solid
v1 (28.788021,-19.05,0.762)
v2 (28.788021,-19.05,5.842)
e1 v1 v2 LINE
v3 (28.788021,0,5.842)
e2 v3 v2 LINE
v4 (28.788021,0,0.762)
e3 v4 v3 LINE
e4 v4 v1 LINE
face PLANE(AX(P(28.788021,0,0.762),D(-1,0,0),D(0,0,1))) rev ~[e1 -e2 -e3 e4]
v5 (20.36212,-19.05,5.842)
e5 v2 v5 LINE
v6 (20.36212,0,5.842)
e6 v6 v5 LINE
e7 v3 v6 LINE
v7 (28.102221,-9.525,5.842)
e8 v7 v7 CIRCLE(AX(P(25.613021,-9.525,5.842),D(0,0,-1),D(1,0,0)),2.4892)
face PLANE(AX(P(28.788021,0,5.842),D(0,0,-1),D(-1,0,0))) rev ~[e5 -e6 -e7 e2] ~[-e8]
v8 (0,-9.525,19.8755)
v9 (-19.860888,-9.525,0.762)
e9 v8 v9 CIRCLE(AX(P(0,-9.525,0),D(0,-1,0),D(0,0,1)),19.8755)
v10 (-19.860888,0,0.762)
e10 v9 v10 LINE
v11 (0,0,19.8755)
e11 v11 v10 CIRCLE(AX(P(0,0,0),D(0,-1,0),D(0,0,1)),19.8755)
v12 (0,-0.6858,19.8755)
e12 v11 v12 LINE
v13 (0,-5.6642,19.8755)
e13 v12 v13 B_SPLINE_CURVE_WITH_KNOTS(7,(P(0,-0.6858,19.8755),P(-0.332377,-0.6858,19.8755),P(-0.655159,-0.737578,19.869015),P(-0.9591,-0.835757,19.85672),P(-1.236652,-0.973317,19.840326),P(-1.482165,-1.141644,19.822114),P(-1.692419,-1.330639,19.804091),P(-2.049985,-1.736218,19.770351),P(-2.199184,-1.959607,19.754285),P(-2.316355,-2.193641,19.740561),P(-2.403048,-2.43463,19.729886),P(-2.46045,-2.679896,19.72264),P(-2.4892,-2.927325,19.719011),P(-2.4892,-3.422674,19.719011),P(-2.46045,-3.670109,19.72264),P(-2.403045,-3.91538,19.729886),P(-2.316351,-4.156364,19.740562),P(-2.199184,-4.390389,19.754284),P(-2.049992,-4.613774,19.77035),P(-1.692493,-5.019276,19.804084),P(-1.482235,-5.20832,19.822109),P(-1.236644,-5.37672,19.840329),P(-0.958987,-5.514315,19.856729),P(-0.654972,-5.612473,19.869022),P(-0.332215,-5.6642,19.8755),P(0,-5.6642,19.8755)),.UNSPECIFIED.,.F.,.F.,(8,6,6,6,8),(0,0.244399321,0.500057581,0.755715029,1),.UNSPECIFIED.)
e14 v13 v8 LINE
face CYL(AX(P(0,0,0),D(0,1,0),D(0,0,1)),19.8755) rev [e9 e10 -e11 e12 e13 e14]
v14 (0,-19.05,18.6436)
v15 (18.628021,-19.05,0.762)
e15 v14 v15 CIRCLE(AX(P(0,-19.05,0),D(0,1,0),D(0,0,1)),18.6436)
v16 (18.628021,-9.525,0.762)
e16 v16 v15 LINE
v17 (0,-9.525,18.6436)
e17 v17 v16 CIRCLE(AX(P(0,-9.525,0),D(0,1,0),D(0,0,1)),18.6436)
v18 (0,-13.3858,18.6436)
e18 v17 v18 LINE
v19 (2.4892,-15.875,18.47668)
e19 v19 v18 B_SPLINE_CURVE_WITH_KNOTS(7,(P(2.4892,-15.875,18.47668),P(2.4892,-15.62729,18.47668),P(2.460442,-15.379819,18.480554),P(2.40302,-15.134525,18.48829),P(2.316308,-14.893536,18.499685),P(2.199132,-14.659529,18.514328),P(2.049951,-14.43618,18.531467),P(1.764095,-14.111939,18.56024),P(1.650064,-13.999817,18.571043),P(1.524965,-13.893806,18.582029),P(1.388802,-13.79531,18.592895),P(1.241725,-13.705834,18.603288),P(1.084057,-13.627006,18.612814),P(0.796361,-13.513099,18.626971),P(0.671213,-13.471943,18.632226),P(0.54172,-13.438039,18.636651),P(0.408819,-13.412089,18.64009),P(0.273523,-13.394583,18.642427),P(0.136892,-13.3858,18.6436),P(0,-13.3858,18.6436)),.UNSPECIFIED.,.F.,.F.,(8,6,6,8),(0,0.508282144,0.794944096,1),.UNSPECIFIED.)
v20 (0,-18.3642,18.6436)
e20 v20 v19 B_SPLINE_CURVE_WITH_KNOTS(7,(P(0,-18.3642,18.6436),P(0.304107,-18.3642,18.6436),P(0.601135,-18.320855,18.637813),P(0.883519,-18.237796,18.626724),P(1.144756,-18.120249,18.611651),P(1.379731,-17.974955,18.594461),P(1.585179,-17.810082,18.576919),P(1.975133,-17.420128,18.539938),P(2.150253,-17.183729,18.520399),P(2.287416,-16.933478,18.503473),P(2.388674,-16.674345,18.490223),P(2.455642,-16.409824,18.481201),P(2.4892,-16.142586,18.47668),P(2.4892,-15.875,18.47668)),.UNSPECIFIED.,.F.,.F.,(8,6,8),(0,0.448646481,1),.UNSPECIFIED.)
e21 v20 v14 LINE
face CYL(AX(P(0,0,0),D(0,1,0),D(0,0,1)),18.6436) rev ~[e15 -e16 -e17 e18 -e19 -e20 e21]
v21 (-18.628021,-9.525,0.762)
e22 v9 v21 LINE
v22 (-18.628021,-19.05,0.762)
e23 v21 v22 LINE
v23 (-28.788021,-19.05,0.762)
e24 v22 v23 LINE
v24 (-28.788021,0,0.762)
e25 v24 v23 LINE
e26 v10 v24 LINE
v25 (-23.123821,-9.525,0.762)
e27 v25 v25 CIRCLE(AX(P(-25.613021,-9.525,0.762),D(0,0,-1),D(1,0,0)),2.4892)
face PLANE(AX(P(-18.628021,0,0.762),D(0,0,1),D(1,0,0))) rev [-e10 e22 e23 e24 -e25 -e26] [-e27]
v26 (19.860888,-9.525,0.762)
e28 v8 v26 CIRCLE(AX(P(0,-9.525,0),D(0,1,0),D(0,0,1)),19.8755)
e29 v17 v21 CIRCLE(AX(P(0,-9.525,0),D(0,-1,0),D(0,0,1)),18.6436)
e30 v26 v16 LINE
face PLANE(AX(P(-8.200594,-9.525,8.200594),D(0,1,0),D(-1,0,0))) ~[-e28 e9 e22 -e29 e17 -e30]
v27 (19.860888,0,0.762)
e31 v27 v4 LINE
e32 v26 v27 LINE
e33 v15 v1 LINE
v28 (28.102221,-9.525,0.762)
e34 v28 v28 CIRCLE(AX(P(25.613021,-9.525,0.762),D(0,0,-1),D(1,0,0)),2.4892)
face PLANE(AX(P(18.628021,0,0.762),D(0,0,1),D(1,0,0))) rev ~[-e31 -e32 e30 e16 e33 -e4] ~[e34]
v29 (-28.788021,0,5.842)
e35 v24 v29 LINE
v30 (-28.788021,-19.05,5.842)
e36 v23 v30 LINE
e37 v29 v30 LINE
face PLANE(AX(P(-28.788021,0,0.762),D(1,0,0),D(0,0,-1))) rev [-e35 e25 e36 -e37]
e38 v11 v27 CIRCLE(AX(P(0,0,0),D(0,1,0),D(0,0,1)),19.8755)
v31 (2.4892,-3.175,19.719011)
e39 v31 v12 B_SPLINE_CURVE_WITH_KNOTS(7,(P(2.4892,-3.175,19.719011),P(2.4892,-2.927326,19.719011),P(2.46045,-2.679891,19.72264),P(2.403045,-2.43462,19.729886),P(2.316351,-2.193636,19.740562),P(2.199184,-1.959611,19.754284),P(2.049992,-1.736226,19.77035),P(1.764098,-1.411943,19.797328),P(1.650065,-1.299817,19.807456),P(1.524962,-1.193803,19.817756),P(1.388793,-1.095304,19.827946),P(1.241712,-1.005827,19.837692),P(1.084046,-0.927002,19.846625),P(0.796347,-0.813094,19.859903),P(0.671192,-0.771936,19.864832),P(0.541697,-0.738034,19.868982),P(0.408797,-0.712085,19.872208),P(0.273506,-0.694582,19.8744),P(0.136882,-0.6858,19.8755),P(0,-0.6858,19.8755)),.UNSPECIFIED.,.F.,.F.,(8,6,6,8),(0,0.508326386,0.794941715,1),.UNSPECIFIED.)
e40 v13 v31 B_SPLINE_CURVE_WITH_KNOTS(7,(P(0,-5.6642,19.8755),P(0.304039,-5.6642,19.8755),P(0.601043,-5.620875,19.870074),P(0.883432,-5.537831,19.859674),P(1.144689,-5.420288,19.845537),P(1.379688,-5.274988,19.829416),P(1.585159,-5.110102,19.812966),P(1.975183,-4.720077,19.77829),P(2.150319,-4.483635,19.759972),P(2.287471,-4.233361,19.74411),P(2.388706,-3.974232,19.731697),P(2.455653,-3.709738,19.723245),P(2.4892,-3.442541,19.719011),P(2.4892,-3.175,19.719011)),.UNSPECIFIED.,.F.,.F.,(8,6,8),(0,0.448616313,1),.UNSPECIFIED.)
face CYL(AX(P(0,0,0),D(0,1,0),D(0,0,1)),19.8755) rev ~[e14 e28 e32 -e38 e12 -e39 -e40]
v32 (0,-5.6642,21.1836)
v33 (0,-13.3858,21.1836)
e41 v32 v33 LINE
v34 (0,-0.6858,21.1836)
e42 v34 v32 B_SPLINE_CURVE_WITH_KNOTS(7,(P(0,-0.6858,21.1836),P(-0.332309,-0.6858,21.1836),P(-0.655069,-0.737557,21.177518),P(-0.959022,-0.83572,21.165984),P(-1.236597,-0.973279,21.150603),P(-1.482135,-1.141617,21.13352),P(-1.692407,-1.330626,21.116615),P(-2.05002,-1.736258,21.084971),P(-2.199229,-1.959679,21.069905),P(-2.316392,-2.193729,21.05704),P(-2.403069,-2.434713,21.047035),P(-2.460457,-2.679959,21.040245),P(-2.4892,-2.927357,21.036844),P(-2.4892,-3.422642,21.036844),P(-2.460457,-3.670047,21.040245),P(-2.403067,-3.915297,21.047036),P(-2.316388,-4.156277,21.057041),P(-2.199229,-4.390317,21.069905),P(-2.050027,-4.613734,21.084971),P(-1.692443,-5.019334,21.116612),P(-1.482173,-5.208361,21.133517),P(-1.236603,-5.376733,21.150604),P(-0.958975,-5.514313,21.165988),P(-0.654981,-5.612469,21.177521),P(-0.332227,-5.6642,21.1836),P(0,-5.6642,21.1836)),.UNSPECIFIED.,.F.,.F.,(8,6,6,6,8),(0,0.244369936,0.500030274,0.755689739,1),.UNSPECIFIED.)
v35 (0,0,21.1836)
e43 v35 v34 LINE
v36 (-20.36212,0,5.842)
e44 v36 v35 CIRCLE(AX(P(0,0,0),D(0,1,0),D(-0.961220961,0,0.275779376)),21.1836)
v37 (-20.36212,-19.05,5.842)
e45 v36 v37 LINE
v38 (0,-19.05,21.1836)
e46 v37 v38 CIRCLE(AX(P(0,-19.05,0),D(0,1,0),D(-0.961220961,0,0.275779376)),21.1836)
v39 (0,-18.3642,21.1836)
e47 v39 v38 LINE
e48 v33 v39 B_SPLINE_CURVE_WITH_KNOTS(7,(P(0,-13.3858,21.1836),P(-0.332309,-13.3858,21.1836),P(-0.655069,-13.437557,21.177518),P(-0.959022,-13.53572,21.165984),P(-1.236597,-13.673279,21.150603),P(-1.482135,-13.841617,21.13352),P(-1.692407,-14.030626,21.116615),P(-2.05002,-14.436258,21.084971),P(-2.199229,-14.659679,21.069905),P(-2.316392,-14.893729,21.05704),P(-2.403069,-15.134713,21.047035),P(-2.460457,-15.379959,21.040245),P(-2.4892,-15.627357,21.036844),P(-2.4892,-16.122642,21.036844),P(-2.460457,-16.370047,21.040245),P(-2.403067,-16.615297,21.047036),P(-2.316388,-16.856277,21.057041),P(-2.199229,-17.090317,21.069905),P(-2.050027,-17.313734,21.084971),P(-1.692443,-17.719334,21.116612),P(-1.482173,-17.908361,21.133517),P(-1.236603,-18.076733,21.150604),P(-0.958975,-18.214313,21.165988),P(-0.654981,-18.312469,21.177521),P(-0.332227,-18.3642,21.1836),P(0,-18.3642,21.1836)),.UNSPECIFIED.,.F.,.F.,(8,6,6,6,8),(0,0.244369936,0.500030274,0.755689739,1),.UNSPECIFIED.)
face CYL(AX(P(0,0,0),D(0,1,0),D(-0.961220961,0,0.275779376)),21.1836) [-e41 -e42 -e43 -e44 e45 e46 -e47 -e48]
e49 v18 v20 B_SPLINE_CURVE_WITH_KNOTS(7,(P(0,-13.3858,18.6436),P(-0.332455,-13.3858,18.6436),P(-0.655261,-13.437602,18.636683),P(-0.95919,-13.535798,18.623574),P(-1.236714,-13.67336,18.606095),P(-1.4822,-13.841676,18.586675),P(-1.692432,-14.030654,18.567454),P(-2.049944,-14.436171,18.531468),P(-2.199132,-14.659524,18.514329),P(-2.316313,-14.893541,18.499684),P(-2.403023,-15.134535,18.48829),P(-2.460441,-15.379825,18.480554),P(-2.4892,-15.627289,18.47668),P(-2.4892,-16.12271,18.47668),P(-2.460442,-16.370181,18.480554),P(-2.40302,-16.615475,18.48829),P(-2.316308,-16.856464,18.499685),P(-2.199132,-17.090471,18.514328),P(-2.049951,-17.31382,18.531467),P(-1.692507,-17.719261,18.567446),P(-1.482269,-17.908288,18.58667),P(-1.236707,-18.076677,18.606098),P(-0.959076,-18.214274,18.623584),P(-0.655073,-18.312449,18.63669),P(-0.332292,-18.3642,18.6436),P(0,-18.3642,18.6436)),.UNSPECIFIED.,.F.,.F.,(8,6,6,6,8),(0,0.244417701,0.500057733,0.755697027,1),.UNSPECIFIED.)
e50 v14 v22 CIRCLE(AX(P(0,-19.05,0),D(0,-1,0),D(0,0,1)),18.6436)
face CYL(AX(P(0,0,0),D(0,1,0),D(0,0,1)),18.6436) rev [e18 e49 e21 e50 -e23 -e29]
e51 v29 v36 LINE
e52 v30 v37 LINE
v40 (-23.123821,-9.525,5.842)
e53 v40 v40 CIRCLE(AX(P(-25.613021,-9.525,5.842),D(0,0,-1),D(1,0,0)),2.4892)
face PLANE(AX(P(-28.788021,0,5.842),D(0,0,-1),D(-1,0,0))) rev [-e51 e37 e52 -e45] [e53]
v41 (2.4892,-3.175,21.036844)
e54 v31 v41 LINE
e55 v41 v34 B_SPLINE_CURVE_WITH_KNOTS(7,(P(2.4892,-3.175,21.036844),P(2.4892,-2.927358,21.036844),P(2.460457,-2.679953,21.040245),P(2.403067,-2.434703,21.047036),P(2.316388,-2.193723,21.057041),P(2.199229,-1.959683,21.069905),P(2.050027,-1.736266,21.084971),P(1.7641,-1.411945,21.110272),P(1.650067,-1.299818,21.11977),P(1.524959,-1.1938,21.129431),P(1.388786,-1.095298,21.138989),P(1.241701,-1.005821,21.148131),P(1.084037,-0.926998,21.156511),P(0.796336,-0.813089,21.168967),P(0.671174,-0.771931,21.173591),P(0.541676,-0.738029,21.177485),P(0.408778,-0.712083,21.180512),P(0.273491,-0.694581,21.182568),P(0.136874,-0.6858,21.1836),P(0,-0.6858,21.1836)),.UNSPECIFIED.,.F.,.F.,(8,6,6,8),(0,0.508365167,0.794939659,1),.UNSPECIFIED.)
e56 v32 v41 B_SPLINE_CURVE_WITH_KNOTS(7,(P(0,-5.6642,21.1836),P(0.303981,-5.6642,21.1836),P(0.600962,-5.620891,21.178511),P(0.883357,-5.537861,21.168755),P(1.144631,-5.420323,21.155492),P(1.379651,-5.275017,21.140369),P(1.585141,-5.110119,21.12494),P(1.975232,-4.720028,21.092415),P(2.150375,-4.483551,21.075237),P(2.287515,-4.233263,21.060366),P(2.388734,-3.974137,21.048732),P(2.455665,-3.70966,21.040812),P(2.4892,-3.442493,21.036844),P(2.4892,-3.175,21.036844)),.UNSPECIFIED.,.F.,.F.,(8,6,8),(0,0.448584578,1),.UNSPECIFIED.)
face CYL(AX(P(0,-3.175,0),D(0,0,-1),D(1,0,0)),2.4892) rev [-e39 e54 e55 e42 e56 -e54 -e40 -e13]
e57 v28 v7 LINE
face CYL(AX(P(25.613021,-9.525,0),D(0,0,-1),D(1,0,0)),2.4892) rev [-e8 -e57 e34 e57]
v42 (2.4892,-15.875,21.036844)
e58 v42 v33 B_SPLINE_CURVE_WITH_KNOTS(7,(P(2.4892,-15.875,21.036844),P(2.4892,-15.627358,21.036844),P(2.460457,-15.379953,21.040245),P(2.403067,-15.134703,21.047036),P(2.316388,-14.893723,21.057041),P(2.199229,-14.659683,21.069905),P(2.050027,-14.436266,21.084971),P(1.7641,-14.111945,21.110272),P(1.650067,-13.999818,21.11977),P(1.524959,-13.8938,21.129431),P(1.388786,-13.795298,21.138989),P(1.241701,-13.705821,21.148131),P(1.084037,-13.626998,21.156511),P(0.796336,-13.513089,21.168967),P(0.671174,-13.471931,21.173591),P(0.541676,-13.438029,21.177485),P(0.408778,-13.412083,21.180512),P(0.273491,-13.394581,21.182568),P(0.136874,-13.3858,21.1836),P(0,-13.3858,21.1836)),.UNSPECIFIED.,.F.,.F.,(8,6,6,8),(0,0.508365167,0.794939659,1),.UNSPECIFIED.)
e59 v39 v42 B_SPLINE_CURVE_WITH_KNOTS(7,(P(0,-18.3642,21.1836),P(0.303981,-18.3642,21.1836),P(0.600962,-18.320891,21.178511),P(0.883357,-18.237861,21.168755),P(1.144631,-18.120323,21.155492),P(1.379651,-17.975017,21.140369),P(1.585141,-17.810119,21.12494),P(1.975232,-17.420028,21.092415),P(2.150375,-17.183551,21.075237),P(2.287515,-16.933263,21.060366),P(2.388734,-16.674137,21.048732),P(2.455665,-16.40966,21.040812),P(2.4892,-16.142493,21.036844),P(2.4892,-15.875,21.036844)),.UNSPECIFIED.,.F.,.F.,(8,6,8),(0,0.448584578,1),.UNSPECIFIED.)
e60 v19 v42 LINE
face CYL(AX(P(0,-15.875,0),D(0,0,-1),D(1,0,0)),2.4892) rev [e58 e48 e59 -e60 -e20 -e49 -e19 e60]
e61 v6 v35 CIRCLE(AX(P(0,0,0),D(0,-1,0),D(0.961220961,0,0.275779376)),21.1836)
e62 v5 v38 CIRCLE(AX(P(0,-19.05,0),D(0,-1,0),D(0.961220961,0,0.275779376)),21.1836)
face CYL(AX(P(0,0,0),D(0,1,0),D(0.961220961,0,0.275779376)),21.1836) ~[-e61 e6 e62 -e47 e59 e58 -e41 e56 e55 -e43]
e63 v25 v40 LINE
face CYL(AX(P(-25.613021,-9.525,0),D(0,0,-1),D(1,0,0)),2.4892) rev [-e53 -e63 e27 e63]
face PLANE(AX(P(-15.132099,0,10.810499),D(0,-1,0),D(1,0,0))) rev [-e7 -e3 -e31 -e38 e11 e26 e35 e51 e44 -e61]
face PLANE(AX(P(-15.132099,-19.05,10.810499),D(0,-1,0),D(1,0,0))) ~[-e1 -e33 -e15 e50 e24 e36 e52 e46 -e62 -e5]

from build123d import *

# Parameters (mm, degrees)
F1_DEPTH = 19.05
F3_DEPTH = 9.525
F5_R     = 2.4892
F6_DEPTH = 25.4


# Not quite as in the source:
# - a length typed as a fraction of an inch, garbled in the dataset ("3 / 203.2 mm" for 3/8 in), is restored


with BuildPart() as f1:
    # F0 (on Front) → F1 (new body)
    with BuildSketch(Plane.XZ):
        with BuildLine():
            ThreePointArc((0, 18.6436), (12.9107977631, 13.4497257251), (18.6280212841, 0.762))
            Line((18.6280212841, 0.762), (28.7880212841, 0.762))
            Line((28.7880212841, 0.762), (28.7880212841, 5.842))
            Line((28.7880212841, 5.842), (20.3621203454, 5.842))
            ThreePointArc((20.3621203454, 5.842), (12.7473588982, 16.9189169299), (0, 21.1836))
            Line((0, 21.1836), (0, 18.6436))
        make_face()
    extrude(amount=F1_DEPTH)

    # F2 (on face) → F3 (cut)
    with BuildSketch(Plane(origin=(0, 0, 0), x_dir=(-1, 0, 0), z_dir=(0, 1, 0))):
        with BuildLine():
            ThreePointArc((0, 19.8755), (-14.0541008295, 14.0541008295), (-19.8755, 0))
            Line((-19.8755, 0), (0, 0))
            Line((0, 0), (0, 19.8755))
        make_face()
    extrude(amount=-F3_DEPTH, mode=Mode.SUBTRACT)

    # F4: F1 across face


with BuildPart() as f1_1:
    add(f1.part)
    add(f1.part.mirror(Plane(origin=(0, -11.0496287129, 20.1229823432), x_dir=(0, -1, 0), z_dir=(-1, 0, 0))))

    # F5 (on Top) → F6 (cut)
    with BuildSketch(Plane.XY):
        with Locations((0, -15.875)):
            Circle(F5_R)
        with Locations((0, -3.175)):
            Circle(F5_R)
        with Locations((-25.6130212841, -9.525)):
            Circle(F5_R)
        with Locations((25.6130212841, -9.525)):
            Circle(F5_R)
    extrude(amount=F6_DEPTH, mode=Mode.SUBTRACT)


solid = f1_1.part
